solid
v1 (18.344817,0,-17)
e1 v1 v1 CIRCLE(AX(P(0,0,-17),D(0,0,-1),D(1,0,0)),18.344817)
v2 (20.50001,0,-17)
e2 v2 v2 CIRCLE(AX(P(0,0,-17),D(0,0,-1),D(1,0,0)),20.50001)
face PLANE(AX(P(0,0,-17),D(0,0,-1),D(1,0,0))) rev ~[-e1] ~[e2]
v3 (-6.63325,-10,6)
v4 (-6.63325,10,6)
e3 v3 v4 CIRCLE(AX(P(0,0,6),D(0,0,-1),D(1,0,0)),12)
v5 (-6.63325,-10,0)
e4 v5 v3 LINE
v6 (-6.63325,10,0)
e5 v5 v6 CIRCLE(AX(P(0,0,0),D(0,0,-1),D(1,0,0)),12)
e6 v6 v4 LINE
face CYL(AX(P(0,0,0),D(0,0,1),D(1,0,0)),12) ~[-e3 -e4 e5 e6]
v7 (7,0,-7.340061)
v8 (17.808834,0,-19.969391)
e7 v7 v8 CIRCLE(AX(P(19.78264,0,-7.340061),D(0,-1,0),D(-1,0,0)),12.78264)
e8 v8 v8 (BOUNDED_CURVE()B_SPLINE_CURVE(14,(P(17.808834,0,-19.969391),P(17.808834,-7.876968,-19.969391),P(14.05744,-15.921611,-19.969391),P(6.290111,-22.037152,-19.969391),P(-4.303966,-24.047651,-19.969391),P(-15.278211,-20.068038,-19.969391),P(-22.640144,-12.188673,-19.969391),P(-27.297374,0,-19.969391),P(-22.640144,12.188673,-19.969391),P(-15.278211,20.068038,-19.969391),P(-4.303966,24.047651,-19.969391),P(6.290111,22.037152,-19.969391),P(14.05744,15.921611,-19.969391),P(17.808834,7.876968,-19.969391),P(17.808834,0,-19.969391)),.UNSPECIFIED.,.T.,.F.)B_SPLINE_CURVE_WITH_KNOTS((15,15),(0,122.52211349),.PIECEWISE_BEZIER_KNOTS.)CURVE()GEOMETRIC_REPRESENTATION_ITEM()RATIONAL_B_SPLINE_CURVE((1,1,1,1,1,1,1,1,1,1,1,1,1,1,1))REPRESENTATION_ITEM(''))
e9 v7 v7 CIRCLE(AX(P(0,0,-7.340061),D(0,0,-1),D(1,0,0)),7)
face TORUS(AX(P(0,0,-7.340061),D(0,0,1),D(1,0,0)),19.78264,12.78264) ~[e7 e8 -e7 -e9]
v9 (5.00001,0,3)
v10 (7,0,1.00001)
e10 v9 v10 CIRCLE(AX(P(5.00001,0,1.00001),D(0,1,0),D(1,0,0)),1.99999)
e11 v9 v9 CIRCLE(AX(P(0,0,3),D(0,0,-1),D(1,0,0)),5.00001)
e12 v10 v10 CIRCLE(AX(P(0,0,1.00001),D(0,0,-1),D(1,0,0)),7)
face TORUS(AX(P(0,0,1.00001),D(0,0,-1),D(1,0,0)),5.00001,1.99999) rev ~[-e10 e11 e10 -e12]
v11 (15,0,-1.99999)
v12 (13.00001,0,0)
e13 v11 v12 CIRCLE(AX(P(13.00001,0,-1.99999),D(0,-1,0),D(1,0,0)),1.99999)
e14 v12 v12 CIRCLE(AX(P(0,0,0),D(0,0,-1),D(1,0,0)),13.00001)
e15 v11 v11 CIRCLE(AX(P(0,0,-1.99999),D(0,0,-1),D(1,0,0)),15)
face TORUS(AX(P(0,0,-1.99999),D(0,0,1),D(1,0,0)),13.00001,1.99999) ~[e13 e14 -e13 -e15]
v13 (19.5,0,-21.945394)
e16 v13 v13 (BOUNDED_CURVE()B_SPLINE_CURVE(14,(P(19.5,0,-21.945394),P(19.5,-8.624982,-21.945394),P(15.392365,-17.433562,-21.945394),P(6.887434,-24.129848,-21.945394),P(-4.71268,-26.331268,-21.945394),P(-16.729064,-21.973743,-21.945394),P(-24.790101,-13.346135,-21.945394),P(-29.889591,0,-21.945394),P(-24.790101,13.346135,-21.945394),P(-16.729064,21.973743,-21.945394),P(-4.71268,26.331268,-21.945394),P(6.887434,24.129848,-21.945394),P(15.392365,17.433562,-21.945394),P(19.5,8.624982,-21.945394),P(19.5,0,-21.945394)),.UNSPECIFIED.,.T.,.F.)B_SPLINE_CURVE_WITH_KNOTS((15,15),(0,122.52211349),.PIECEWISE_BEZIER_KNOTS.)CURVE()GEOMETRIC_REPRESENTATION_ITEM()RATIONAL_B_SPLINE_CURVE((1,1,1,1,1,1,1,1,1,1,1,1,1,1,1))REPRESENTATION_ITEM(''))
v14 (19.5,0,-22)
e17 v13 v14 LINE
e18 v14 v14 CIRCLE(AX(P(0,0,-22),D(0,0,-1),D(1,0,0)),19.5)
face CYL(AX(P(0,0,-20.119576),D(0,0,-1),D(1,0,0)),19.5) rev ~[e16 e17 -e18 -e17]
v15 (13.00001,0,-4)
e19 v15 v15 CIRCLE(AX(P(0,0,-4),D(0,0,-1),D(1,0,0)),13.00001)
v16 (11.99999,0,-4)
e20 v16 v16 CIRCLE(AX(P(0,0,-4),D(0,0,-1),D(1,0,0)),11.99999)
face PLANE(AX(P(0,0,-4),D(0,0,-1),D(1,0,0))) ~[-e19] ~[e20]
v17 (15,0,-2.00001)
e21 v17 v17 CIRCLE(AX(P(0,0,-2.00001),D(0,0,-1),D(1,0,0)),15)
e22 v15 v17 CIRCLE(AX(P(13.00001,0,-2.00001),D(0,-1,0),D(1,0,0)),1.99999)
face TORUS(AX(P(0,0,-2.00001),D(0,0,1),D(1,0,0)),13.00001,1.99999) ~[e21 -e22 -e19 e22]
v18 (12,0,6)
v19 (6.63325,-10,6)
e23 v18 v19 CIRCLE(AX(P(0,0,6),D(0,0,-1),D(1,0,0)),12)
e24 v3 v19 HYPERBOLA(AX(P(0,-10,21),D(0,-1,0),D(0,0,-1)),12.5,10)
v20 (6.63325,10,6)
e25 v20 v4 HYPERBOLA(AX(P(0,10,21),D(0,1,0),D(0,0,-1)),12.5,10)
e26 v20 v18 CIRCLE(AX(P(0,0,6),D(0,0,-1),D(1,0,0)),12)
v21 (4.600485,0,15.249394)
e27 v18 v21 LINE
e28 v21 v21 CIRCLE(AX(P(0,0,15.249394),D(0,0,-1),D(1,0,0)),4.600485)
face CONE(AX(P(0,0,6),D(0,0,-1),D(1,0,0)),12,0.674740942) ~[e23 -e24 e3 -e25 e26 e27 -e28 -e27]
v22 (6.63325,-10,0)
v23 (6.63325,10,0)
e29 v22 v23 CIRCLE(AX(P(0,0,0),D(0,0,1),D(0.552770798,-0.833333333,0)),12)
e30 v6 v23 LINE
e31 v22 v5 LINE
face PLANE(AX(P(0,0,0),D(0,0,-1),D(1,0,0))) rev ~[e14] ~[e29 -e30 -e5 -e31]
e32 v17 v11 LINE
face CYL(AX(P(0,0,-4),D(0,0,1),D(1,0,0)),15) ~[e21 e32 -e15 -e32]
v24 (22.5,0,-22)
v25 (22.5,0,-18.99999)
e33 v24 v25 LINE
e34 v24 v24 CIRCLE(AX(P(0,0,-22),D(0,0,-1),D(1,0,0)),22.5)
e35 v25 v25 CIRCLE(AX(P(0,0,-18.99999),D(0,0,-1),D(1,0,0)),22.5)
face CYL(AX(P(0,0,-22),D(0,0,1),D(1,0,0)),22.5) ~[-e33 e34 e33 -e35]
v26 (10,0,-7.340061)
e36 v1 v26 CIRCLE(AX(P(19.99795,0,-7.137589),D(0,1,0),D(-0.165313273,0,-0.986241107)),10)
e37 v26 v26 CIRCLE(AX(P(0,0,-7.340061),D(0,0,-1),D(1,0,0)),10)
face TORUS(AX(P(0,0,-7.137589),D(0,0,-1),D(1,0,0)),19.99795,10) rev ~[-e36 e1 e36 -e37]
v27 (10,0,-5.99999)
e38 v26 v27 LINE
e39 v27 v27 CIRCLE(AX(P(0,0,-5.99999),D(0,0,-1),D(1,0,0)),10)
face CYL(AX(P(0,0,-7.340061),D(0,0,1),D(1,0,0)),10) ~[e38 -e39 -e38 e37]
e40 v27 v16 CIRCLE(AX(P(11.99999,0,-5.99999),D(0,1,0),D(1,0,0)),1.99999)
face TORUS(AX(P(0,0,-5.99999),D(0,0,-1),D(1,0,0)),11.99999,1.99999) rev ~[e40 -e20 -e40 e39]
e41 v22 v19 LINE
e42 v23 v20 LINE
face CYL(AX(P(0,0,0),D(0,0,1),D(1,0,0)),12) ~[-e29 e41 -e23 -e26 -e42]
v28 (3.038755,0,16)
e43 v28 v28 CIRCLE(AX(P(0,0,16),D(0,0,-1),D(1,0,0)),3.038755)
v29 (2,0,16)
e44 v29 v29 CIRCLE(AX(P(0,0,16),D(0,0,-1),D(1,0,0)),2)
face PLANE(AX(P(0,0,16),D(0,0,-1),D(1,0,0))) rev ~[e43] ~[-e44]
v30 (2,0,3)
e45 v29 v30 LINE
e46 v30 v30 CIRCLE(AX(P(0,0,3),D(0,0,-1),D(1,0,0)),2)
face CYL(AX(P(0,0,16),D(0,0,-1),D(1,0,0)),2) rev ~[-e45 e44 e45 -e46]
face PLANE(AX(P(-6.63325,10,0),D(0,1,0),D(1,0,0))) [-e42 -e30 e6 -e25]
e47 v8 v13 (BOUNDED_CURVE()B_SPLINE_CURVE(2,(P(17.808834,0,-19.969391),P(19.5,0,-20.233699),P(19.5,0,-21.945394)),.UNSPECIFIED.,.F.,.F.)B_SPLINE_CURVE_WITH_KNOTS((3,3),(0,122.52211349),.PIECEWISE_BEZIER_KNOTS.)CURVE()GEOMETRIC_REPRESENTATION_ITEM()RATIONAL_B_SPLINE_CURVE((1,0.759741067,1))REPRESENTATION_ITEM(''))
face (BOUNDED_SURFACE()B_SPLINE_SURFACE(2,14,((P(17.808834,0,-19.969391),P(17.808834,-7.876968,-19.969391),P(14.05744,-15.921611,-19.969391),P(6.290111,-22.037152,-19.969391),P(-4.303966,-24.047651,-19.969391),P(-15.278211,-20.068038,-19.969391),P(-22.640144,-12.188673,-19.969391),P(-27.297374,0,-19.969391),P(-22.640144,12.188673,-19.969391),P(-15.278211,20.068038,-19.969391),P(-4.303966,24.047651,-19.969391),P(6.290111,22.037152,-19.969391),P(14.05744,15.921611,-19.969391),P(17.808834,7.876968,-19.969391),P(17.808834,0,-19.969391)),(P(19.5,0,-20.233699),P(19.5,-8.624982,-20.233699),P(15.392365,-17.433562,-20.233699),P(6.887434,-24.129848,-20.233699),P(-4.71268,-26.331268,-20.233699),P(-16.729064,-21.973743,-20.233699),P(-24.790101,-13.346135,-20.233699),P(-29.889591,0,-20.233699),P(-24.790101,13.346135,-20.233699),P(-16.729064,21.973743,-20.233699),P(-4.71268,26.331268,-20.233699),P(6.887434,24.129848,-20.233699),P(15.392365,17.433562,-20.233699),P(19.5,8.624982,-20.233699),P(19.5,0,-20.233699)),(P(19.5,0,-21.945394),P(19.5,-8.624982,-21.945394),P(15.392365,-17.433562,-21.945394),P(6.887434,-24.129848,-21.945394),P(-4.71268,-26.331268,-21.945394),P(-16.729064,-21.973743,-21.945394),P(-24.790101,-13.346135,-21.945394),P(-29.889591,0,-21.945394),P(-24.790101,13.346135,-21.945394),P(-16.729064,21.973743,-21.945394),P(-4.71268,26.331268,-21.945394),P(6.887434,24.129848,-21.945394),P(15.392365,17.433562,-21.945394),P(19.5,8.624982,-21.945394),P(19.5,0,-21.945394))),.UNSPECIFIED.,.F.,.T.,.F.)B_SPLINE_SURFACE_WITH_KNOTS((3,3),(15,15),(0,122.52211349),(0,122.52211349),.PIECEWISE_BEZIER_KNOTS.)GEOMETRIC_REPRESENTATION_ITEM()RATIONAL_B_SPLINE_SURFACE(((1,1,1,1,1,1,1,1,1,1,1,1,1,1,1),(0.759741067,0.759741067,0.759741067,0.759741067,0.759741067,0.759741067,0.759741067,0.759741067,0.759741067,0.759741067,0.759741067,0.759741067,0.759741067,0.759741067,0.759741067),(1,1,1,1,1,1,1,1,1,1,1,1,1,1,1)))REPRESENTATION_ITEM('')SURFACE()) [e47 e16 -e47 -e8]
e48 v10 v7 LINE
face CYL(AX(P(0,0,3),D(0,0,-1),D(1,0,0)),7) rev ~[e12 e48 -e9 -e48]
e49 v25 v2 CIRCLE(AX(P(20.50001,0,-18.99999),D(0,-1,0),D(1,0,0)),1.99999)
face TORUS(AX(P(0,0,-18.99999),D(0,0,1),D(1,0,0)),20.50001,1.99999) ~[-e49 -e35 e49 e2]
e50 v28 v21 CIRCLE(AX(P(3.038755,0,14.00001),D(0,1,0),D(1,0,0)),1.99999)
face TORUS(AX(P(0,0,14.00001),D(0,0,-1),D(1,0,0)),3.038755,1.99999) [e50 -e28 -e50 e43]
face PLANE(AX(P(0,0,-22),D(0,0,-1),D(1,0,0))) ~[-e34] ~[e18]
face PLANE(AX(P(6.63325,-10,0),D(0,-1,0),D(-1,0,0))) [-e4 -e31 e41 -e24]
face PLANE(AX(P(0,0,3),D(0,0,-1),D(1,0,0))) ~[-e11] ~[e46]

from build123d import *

# Parameters (mm, degrees)
F2_R     = 1.99999
F4_DEPTH = 16.001


# Not quite as in the source:
# - a fillet or chamfer is up to 0.001 mm smaller than in the source, because OpenCascade refuses the exact size


with BuildPart() as f1:
    # F0 (on Front) → F1 (revolve)
    with BuildSketch(Plane.XZ):
        with BuildLine():
            Line((4, 16), (2, 16))
            Line((2, 16), (2, 3))
            Line((2, 3), (7, 3))
            Line((7, 3), (7, -7.3400610127))
            ThreePointArc((7, -7.3400610127), (10.6445666102, -16.2782654993), (19.5, -20.1195757836))
            Line((19.5, -20.1195757836), (19.5, -22))
            Line((19.5, -22), (22.5, -22))
            Line((22.5, -22), (22.5, -17))
            Line((22.5, -17), (18.3448173129, -17))
            ThreePointArc((18.3448173129, -17), (12.4305503735, -13.6747490325), (10, -7.3400610127))
            Line((10, -7.3400610127), (10, -4))
            Line((10, -4), (15, -4))
            Line((15, -4), (15, 0))
            Line((15, 0), (12, 0))
            Line((12, 0), (12, 6))
            Line((12, 6), (4, 16))
        make_face()
    revolve(axis=Axis((0, 0, 9.5), (0, 0, -1)))

    # F2 (radius 2 in the source; OpenCascade refuses exactly that, so slightly less here)
    f2_edges = [f1.edges().sort_by_distance(p)[0] for p in [
        (-4, 0, 16),
        (-15, 0, 0),
        (-15, 0, -4),
        (-22.5, 0, -17),
        (-19.5, 0, -20.119576),
        (-10, 0, -4),
        (-7, 0, 3),
    ]]
    fillet(f2_edges, radius=F2_R)

    # F3 (on Top) → F4 (cut, through all)
    with BuildSketch(Plane.XY):
        with BuildLine():
            Line((-6.6332495807, 10), (6.6332495807, 10))
            ThreePointArc((6.6332495807, 10), (0, 12), (-6.6332495807, 10))
        make_face()
        with BuildLine():
            ThreePointArc((-6.6332495807, -10), (0, -12), (6.6332495807, -10))
            Line((6.6332495807, -10), (-6.6332495807, -10))
        make_face()
    extrude(amount=F4_DEPTH, mode=Mode.SUBTRACT)


solid = f1.part
